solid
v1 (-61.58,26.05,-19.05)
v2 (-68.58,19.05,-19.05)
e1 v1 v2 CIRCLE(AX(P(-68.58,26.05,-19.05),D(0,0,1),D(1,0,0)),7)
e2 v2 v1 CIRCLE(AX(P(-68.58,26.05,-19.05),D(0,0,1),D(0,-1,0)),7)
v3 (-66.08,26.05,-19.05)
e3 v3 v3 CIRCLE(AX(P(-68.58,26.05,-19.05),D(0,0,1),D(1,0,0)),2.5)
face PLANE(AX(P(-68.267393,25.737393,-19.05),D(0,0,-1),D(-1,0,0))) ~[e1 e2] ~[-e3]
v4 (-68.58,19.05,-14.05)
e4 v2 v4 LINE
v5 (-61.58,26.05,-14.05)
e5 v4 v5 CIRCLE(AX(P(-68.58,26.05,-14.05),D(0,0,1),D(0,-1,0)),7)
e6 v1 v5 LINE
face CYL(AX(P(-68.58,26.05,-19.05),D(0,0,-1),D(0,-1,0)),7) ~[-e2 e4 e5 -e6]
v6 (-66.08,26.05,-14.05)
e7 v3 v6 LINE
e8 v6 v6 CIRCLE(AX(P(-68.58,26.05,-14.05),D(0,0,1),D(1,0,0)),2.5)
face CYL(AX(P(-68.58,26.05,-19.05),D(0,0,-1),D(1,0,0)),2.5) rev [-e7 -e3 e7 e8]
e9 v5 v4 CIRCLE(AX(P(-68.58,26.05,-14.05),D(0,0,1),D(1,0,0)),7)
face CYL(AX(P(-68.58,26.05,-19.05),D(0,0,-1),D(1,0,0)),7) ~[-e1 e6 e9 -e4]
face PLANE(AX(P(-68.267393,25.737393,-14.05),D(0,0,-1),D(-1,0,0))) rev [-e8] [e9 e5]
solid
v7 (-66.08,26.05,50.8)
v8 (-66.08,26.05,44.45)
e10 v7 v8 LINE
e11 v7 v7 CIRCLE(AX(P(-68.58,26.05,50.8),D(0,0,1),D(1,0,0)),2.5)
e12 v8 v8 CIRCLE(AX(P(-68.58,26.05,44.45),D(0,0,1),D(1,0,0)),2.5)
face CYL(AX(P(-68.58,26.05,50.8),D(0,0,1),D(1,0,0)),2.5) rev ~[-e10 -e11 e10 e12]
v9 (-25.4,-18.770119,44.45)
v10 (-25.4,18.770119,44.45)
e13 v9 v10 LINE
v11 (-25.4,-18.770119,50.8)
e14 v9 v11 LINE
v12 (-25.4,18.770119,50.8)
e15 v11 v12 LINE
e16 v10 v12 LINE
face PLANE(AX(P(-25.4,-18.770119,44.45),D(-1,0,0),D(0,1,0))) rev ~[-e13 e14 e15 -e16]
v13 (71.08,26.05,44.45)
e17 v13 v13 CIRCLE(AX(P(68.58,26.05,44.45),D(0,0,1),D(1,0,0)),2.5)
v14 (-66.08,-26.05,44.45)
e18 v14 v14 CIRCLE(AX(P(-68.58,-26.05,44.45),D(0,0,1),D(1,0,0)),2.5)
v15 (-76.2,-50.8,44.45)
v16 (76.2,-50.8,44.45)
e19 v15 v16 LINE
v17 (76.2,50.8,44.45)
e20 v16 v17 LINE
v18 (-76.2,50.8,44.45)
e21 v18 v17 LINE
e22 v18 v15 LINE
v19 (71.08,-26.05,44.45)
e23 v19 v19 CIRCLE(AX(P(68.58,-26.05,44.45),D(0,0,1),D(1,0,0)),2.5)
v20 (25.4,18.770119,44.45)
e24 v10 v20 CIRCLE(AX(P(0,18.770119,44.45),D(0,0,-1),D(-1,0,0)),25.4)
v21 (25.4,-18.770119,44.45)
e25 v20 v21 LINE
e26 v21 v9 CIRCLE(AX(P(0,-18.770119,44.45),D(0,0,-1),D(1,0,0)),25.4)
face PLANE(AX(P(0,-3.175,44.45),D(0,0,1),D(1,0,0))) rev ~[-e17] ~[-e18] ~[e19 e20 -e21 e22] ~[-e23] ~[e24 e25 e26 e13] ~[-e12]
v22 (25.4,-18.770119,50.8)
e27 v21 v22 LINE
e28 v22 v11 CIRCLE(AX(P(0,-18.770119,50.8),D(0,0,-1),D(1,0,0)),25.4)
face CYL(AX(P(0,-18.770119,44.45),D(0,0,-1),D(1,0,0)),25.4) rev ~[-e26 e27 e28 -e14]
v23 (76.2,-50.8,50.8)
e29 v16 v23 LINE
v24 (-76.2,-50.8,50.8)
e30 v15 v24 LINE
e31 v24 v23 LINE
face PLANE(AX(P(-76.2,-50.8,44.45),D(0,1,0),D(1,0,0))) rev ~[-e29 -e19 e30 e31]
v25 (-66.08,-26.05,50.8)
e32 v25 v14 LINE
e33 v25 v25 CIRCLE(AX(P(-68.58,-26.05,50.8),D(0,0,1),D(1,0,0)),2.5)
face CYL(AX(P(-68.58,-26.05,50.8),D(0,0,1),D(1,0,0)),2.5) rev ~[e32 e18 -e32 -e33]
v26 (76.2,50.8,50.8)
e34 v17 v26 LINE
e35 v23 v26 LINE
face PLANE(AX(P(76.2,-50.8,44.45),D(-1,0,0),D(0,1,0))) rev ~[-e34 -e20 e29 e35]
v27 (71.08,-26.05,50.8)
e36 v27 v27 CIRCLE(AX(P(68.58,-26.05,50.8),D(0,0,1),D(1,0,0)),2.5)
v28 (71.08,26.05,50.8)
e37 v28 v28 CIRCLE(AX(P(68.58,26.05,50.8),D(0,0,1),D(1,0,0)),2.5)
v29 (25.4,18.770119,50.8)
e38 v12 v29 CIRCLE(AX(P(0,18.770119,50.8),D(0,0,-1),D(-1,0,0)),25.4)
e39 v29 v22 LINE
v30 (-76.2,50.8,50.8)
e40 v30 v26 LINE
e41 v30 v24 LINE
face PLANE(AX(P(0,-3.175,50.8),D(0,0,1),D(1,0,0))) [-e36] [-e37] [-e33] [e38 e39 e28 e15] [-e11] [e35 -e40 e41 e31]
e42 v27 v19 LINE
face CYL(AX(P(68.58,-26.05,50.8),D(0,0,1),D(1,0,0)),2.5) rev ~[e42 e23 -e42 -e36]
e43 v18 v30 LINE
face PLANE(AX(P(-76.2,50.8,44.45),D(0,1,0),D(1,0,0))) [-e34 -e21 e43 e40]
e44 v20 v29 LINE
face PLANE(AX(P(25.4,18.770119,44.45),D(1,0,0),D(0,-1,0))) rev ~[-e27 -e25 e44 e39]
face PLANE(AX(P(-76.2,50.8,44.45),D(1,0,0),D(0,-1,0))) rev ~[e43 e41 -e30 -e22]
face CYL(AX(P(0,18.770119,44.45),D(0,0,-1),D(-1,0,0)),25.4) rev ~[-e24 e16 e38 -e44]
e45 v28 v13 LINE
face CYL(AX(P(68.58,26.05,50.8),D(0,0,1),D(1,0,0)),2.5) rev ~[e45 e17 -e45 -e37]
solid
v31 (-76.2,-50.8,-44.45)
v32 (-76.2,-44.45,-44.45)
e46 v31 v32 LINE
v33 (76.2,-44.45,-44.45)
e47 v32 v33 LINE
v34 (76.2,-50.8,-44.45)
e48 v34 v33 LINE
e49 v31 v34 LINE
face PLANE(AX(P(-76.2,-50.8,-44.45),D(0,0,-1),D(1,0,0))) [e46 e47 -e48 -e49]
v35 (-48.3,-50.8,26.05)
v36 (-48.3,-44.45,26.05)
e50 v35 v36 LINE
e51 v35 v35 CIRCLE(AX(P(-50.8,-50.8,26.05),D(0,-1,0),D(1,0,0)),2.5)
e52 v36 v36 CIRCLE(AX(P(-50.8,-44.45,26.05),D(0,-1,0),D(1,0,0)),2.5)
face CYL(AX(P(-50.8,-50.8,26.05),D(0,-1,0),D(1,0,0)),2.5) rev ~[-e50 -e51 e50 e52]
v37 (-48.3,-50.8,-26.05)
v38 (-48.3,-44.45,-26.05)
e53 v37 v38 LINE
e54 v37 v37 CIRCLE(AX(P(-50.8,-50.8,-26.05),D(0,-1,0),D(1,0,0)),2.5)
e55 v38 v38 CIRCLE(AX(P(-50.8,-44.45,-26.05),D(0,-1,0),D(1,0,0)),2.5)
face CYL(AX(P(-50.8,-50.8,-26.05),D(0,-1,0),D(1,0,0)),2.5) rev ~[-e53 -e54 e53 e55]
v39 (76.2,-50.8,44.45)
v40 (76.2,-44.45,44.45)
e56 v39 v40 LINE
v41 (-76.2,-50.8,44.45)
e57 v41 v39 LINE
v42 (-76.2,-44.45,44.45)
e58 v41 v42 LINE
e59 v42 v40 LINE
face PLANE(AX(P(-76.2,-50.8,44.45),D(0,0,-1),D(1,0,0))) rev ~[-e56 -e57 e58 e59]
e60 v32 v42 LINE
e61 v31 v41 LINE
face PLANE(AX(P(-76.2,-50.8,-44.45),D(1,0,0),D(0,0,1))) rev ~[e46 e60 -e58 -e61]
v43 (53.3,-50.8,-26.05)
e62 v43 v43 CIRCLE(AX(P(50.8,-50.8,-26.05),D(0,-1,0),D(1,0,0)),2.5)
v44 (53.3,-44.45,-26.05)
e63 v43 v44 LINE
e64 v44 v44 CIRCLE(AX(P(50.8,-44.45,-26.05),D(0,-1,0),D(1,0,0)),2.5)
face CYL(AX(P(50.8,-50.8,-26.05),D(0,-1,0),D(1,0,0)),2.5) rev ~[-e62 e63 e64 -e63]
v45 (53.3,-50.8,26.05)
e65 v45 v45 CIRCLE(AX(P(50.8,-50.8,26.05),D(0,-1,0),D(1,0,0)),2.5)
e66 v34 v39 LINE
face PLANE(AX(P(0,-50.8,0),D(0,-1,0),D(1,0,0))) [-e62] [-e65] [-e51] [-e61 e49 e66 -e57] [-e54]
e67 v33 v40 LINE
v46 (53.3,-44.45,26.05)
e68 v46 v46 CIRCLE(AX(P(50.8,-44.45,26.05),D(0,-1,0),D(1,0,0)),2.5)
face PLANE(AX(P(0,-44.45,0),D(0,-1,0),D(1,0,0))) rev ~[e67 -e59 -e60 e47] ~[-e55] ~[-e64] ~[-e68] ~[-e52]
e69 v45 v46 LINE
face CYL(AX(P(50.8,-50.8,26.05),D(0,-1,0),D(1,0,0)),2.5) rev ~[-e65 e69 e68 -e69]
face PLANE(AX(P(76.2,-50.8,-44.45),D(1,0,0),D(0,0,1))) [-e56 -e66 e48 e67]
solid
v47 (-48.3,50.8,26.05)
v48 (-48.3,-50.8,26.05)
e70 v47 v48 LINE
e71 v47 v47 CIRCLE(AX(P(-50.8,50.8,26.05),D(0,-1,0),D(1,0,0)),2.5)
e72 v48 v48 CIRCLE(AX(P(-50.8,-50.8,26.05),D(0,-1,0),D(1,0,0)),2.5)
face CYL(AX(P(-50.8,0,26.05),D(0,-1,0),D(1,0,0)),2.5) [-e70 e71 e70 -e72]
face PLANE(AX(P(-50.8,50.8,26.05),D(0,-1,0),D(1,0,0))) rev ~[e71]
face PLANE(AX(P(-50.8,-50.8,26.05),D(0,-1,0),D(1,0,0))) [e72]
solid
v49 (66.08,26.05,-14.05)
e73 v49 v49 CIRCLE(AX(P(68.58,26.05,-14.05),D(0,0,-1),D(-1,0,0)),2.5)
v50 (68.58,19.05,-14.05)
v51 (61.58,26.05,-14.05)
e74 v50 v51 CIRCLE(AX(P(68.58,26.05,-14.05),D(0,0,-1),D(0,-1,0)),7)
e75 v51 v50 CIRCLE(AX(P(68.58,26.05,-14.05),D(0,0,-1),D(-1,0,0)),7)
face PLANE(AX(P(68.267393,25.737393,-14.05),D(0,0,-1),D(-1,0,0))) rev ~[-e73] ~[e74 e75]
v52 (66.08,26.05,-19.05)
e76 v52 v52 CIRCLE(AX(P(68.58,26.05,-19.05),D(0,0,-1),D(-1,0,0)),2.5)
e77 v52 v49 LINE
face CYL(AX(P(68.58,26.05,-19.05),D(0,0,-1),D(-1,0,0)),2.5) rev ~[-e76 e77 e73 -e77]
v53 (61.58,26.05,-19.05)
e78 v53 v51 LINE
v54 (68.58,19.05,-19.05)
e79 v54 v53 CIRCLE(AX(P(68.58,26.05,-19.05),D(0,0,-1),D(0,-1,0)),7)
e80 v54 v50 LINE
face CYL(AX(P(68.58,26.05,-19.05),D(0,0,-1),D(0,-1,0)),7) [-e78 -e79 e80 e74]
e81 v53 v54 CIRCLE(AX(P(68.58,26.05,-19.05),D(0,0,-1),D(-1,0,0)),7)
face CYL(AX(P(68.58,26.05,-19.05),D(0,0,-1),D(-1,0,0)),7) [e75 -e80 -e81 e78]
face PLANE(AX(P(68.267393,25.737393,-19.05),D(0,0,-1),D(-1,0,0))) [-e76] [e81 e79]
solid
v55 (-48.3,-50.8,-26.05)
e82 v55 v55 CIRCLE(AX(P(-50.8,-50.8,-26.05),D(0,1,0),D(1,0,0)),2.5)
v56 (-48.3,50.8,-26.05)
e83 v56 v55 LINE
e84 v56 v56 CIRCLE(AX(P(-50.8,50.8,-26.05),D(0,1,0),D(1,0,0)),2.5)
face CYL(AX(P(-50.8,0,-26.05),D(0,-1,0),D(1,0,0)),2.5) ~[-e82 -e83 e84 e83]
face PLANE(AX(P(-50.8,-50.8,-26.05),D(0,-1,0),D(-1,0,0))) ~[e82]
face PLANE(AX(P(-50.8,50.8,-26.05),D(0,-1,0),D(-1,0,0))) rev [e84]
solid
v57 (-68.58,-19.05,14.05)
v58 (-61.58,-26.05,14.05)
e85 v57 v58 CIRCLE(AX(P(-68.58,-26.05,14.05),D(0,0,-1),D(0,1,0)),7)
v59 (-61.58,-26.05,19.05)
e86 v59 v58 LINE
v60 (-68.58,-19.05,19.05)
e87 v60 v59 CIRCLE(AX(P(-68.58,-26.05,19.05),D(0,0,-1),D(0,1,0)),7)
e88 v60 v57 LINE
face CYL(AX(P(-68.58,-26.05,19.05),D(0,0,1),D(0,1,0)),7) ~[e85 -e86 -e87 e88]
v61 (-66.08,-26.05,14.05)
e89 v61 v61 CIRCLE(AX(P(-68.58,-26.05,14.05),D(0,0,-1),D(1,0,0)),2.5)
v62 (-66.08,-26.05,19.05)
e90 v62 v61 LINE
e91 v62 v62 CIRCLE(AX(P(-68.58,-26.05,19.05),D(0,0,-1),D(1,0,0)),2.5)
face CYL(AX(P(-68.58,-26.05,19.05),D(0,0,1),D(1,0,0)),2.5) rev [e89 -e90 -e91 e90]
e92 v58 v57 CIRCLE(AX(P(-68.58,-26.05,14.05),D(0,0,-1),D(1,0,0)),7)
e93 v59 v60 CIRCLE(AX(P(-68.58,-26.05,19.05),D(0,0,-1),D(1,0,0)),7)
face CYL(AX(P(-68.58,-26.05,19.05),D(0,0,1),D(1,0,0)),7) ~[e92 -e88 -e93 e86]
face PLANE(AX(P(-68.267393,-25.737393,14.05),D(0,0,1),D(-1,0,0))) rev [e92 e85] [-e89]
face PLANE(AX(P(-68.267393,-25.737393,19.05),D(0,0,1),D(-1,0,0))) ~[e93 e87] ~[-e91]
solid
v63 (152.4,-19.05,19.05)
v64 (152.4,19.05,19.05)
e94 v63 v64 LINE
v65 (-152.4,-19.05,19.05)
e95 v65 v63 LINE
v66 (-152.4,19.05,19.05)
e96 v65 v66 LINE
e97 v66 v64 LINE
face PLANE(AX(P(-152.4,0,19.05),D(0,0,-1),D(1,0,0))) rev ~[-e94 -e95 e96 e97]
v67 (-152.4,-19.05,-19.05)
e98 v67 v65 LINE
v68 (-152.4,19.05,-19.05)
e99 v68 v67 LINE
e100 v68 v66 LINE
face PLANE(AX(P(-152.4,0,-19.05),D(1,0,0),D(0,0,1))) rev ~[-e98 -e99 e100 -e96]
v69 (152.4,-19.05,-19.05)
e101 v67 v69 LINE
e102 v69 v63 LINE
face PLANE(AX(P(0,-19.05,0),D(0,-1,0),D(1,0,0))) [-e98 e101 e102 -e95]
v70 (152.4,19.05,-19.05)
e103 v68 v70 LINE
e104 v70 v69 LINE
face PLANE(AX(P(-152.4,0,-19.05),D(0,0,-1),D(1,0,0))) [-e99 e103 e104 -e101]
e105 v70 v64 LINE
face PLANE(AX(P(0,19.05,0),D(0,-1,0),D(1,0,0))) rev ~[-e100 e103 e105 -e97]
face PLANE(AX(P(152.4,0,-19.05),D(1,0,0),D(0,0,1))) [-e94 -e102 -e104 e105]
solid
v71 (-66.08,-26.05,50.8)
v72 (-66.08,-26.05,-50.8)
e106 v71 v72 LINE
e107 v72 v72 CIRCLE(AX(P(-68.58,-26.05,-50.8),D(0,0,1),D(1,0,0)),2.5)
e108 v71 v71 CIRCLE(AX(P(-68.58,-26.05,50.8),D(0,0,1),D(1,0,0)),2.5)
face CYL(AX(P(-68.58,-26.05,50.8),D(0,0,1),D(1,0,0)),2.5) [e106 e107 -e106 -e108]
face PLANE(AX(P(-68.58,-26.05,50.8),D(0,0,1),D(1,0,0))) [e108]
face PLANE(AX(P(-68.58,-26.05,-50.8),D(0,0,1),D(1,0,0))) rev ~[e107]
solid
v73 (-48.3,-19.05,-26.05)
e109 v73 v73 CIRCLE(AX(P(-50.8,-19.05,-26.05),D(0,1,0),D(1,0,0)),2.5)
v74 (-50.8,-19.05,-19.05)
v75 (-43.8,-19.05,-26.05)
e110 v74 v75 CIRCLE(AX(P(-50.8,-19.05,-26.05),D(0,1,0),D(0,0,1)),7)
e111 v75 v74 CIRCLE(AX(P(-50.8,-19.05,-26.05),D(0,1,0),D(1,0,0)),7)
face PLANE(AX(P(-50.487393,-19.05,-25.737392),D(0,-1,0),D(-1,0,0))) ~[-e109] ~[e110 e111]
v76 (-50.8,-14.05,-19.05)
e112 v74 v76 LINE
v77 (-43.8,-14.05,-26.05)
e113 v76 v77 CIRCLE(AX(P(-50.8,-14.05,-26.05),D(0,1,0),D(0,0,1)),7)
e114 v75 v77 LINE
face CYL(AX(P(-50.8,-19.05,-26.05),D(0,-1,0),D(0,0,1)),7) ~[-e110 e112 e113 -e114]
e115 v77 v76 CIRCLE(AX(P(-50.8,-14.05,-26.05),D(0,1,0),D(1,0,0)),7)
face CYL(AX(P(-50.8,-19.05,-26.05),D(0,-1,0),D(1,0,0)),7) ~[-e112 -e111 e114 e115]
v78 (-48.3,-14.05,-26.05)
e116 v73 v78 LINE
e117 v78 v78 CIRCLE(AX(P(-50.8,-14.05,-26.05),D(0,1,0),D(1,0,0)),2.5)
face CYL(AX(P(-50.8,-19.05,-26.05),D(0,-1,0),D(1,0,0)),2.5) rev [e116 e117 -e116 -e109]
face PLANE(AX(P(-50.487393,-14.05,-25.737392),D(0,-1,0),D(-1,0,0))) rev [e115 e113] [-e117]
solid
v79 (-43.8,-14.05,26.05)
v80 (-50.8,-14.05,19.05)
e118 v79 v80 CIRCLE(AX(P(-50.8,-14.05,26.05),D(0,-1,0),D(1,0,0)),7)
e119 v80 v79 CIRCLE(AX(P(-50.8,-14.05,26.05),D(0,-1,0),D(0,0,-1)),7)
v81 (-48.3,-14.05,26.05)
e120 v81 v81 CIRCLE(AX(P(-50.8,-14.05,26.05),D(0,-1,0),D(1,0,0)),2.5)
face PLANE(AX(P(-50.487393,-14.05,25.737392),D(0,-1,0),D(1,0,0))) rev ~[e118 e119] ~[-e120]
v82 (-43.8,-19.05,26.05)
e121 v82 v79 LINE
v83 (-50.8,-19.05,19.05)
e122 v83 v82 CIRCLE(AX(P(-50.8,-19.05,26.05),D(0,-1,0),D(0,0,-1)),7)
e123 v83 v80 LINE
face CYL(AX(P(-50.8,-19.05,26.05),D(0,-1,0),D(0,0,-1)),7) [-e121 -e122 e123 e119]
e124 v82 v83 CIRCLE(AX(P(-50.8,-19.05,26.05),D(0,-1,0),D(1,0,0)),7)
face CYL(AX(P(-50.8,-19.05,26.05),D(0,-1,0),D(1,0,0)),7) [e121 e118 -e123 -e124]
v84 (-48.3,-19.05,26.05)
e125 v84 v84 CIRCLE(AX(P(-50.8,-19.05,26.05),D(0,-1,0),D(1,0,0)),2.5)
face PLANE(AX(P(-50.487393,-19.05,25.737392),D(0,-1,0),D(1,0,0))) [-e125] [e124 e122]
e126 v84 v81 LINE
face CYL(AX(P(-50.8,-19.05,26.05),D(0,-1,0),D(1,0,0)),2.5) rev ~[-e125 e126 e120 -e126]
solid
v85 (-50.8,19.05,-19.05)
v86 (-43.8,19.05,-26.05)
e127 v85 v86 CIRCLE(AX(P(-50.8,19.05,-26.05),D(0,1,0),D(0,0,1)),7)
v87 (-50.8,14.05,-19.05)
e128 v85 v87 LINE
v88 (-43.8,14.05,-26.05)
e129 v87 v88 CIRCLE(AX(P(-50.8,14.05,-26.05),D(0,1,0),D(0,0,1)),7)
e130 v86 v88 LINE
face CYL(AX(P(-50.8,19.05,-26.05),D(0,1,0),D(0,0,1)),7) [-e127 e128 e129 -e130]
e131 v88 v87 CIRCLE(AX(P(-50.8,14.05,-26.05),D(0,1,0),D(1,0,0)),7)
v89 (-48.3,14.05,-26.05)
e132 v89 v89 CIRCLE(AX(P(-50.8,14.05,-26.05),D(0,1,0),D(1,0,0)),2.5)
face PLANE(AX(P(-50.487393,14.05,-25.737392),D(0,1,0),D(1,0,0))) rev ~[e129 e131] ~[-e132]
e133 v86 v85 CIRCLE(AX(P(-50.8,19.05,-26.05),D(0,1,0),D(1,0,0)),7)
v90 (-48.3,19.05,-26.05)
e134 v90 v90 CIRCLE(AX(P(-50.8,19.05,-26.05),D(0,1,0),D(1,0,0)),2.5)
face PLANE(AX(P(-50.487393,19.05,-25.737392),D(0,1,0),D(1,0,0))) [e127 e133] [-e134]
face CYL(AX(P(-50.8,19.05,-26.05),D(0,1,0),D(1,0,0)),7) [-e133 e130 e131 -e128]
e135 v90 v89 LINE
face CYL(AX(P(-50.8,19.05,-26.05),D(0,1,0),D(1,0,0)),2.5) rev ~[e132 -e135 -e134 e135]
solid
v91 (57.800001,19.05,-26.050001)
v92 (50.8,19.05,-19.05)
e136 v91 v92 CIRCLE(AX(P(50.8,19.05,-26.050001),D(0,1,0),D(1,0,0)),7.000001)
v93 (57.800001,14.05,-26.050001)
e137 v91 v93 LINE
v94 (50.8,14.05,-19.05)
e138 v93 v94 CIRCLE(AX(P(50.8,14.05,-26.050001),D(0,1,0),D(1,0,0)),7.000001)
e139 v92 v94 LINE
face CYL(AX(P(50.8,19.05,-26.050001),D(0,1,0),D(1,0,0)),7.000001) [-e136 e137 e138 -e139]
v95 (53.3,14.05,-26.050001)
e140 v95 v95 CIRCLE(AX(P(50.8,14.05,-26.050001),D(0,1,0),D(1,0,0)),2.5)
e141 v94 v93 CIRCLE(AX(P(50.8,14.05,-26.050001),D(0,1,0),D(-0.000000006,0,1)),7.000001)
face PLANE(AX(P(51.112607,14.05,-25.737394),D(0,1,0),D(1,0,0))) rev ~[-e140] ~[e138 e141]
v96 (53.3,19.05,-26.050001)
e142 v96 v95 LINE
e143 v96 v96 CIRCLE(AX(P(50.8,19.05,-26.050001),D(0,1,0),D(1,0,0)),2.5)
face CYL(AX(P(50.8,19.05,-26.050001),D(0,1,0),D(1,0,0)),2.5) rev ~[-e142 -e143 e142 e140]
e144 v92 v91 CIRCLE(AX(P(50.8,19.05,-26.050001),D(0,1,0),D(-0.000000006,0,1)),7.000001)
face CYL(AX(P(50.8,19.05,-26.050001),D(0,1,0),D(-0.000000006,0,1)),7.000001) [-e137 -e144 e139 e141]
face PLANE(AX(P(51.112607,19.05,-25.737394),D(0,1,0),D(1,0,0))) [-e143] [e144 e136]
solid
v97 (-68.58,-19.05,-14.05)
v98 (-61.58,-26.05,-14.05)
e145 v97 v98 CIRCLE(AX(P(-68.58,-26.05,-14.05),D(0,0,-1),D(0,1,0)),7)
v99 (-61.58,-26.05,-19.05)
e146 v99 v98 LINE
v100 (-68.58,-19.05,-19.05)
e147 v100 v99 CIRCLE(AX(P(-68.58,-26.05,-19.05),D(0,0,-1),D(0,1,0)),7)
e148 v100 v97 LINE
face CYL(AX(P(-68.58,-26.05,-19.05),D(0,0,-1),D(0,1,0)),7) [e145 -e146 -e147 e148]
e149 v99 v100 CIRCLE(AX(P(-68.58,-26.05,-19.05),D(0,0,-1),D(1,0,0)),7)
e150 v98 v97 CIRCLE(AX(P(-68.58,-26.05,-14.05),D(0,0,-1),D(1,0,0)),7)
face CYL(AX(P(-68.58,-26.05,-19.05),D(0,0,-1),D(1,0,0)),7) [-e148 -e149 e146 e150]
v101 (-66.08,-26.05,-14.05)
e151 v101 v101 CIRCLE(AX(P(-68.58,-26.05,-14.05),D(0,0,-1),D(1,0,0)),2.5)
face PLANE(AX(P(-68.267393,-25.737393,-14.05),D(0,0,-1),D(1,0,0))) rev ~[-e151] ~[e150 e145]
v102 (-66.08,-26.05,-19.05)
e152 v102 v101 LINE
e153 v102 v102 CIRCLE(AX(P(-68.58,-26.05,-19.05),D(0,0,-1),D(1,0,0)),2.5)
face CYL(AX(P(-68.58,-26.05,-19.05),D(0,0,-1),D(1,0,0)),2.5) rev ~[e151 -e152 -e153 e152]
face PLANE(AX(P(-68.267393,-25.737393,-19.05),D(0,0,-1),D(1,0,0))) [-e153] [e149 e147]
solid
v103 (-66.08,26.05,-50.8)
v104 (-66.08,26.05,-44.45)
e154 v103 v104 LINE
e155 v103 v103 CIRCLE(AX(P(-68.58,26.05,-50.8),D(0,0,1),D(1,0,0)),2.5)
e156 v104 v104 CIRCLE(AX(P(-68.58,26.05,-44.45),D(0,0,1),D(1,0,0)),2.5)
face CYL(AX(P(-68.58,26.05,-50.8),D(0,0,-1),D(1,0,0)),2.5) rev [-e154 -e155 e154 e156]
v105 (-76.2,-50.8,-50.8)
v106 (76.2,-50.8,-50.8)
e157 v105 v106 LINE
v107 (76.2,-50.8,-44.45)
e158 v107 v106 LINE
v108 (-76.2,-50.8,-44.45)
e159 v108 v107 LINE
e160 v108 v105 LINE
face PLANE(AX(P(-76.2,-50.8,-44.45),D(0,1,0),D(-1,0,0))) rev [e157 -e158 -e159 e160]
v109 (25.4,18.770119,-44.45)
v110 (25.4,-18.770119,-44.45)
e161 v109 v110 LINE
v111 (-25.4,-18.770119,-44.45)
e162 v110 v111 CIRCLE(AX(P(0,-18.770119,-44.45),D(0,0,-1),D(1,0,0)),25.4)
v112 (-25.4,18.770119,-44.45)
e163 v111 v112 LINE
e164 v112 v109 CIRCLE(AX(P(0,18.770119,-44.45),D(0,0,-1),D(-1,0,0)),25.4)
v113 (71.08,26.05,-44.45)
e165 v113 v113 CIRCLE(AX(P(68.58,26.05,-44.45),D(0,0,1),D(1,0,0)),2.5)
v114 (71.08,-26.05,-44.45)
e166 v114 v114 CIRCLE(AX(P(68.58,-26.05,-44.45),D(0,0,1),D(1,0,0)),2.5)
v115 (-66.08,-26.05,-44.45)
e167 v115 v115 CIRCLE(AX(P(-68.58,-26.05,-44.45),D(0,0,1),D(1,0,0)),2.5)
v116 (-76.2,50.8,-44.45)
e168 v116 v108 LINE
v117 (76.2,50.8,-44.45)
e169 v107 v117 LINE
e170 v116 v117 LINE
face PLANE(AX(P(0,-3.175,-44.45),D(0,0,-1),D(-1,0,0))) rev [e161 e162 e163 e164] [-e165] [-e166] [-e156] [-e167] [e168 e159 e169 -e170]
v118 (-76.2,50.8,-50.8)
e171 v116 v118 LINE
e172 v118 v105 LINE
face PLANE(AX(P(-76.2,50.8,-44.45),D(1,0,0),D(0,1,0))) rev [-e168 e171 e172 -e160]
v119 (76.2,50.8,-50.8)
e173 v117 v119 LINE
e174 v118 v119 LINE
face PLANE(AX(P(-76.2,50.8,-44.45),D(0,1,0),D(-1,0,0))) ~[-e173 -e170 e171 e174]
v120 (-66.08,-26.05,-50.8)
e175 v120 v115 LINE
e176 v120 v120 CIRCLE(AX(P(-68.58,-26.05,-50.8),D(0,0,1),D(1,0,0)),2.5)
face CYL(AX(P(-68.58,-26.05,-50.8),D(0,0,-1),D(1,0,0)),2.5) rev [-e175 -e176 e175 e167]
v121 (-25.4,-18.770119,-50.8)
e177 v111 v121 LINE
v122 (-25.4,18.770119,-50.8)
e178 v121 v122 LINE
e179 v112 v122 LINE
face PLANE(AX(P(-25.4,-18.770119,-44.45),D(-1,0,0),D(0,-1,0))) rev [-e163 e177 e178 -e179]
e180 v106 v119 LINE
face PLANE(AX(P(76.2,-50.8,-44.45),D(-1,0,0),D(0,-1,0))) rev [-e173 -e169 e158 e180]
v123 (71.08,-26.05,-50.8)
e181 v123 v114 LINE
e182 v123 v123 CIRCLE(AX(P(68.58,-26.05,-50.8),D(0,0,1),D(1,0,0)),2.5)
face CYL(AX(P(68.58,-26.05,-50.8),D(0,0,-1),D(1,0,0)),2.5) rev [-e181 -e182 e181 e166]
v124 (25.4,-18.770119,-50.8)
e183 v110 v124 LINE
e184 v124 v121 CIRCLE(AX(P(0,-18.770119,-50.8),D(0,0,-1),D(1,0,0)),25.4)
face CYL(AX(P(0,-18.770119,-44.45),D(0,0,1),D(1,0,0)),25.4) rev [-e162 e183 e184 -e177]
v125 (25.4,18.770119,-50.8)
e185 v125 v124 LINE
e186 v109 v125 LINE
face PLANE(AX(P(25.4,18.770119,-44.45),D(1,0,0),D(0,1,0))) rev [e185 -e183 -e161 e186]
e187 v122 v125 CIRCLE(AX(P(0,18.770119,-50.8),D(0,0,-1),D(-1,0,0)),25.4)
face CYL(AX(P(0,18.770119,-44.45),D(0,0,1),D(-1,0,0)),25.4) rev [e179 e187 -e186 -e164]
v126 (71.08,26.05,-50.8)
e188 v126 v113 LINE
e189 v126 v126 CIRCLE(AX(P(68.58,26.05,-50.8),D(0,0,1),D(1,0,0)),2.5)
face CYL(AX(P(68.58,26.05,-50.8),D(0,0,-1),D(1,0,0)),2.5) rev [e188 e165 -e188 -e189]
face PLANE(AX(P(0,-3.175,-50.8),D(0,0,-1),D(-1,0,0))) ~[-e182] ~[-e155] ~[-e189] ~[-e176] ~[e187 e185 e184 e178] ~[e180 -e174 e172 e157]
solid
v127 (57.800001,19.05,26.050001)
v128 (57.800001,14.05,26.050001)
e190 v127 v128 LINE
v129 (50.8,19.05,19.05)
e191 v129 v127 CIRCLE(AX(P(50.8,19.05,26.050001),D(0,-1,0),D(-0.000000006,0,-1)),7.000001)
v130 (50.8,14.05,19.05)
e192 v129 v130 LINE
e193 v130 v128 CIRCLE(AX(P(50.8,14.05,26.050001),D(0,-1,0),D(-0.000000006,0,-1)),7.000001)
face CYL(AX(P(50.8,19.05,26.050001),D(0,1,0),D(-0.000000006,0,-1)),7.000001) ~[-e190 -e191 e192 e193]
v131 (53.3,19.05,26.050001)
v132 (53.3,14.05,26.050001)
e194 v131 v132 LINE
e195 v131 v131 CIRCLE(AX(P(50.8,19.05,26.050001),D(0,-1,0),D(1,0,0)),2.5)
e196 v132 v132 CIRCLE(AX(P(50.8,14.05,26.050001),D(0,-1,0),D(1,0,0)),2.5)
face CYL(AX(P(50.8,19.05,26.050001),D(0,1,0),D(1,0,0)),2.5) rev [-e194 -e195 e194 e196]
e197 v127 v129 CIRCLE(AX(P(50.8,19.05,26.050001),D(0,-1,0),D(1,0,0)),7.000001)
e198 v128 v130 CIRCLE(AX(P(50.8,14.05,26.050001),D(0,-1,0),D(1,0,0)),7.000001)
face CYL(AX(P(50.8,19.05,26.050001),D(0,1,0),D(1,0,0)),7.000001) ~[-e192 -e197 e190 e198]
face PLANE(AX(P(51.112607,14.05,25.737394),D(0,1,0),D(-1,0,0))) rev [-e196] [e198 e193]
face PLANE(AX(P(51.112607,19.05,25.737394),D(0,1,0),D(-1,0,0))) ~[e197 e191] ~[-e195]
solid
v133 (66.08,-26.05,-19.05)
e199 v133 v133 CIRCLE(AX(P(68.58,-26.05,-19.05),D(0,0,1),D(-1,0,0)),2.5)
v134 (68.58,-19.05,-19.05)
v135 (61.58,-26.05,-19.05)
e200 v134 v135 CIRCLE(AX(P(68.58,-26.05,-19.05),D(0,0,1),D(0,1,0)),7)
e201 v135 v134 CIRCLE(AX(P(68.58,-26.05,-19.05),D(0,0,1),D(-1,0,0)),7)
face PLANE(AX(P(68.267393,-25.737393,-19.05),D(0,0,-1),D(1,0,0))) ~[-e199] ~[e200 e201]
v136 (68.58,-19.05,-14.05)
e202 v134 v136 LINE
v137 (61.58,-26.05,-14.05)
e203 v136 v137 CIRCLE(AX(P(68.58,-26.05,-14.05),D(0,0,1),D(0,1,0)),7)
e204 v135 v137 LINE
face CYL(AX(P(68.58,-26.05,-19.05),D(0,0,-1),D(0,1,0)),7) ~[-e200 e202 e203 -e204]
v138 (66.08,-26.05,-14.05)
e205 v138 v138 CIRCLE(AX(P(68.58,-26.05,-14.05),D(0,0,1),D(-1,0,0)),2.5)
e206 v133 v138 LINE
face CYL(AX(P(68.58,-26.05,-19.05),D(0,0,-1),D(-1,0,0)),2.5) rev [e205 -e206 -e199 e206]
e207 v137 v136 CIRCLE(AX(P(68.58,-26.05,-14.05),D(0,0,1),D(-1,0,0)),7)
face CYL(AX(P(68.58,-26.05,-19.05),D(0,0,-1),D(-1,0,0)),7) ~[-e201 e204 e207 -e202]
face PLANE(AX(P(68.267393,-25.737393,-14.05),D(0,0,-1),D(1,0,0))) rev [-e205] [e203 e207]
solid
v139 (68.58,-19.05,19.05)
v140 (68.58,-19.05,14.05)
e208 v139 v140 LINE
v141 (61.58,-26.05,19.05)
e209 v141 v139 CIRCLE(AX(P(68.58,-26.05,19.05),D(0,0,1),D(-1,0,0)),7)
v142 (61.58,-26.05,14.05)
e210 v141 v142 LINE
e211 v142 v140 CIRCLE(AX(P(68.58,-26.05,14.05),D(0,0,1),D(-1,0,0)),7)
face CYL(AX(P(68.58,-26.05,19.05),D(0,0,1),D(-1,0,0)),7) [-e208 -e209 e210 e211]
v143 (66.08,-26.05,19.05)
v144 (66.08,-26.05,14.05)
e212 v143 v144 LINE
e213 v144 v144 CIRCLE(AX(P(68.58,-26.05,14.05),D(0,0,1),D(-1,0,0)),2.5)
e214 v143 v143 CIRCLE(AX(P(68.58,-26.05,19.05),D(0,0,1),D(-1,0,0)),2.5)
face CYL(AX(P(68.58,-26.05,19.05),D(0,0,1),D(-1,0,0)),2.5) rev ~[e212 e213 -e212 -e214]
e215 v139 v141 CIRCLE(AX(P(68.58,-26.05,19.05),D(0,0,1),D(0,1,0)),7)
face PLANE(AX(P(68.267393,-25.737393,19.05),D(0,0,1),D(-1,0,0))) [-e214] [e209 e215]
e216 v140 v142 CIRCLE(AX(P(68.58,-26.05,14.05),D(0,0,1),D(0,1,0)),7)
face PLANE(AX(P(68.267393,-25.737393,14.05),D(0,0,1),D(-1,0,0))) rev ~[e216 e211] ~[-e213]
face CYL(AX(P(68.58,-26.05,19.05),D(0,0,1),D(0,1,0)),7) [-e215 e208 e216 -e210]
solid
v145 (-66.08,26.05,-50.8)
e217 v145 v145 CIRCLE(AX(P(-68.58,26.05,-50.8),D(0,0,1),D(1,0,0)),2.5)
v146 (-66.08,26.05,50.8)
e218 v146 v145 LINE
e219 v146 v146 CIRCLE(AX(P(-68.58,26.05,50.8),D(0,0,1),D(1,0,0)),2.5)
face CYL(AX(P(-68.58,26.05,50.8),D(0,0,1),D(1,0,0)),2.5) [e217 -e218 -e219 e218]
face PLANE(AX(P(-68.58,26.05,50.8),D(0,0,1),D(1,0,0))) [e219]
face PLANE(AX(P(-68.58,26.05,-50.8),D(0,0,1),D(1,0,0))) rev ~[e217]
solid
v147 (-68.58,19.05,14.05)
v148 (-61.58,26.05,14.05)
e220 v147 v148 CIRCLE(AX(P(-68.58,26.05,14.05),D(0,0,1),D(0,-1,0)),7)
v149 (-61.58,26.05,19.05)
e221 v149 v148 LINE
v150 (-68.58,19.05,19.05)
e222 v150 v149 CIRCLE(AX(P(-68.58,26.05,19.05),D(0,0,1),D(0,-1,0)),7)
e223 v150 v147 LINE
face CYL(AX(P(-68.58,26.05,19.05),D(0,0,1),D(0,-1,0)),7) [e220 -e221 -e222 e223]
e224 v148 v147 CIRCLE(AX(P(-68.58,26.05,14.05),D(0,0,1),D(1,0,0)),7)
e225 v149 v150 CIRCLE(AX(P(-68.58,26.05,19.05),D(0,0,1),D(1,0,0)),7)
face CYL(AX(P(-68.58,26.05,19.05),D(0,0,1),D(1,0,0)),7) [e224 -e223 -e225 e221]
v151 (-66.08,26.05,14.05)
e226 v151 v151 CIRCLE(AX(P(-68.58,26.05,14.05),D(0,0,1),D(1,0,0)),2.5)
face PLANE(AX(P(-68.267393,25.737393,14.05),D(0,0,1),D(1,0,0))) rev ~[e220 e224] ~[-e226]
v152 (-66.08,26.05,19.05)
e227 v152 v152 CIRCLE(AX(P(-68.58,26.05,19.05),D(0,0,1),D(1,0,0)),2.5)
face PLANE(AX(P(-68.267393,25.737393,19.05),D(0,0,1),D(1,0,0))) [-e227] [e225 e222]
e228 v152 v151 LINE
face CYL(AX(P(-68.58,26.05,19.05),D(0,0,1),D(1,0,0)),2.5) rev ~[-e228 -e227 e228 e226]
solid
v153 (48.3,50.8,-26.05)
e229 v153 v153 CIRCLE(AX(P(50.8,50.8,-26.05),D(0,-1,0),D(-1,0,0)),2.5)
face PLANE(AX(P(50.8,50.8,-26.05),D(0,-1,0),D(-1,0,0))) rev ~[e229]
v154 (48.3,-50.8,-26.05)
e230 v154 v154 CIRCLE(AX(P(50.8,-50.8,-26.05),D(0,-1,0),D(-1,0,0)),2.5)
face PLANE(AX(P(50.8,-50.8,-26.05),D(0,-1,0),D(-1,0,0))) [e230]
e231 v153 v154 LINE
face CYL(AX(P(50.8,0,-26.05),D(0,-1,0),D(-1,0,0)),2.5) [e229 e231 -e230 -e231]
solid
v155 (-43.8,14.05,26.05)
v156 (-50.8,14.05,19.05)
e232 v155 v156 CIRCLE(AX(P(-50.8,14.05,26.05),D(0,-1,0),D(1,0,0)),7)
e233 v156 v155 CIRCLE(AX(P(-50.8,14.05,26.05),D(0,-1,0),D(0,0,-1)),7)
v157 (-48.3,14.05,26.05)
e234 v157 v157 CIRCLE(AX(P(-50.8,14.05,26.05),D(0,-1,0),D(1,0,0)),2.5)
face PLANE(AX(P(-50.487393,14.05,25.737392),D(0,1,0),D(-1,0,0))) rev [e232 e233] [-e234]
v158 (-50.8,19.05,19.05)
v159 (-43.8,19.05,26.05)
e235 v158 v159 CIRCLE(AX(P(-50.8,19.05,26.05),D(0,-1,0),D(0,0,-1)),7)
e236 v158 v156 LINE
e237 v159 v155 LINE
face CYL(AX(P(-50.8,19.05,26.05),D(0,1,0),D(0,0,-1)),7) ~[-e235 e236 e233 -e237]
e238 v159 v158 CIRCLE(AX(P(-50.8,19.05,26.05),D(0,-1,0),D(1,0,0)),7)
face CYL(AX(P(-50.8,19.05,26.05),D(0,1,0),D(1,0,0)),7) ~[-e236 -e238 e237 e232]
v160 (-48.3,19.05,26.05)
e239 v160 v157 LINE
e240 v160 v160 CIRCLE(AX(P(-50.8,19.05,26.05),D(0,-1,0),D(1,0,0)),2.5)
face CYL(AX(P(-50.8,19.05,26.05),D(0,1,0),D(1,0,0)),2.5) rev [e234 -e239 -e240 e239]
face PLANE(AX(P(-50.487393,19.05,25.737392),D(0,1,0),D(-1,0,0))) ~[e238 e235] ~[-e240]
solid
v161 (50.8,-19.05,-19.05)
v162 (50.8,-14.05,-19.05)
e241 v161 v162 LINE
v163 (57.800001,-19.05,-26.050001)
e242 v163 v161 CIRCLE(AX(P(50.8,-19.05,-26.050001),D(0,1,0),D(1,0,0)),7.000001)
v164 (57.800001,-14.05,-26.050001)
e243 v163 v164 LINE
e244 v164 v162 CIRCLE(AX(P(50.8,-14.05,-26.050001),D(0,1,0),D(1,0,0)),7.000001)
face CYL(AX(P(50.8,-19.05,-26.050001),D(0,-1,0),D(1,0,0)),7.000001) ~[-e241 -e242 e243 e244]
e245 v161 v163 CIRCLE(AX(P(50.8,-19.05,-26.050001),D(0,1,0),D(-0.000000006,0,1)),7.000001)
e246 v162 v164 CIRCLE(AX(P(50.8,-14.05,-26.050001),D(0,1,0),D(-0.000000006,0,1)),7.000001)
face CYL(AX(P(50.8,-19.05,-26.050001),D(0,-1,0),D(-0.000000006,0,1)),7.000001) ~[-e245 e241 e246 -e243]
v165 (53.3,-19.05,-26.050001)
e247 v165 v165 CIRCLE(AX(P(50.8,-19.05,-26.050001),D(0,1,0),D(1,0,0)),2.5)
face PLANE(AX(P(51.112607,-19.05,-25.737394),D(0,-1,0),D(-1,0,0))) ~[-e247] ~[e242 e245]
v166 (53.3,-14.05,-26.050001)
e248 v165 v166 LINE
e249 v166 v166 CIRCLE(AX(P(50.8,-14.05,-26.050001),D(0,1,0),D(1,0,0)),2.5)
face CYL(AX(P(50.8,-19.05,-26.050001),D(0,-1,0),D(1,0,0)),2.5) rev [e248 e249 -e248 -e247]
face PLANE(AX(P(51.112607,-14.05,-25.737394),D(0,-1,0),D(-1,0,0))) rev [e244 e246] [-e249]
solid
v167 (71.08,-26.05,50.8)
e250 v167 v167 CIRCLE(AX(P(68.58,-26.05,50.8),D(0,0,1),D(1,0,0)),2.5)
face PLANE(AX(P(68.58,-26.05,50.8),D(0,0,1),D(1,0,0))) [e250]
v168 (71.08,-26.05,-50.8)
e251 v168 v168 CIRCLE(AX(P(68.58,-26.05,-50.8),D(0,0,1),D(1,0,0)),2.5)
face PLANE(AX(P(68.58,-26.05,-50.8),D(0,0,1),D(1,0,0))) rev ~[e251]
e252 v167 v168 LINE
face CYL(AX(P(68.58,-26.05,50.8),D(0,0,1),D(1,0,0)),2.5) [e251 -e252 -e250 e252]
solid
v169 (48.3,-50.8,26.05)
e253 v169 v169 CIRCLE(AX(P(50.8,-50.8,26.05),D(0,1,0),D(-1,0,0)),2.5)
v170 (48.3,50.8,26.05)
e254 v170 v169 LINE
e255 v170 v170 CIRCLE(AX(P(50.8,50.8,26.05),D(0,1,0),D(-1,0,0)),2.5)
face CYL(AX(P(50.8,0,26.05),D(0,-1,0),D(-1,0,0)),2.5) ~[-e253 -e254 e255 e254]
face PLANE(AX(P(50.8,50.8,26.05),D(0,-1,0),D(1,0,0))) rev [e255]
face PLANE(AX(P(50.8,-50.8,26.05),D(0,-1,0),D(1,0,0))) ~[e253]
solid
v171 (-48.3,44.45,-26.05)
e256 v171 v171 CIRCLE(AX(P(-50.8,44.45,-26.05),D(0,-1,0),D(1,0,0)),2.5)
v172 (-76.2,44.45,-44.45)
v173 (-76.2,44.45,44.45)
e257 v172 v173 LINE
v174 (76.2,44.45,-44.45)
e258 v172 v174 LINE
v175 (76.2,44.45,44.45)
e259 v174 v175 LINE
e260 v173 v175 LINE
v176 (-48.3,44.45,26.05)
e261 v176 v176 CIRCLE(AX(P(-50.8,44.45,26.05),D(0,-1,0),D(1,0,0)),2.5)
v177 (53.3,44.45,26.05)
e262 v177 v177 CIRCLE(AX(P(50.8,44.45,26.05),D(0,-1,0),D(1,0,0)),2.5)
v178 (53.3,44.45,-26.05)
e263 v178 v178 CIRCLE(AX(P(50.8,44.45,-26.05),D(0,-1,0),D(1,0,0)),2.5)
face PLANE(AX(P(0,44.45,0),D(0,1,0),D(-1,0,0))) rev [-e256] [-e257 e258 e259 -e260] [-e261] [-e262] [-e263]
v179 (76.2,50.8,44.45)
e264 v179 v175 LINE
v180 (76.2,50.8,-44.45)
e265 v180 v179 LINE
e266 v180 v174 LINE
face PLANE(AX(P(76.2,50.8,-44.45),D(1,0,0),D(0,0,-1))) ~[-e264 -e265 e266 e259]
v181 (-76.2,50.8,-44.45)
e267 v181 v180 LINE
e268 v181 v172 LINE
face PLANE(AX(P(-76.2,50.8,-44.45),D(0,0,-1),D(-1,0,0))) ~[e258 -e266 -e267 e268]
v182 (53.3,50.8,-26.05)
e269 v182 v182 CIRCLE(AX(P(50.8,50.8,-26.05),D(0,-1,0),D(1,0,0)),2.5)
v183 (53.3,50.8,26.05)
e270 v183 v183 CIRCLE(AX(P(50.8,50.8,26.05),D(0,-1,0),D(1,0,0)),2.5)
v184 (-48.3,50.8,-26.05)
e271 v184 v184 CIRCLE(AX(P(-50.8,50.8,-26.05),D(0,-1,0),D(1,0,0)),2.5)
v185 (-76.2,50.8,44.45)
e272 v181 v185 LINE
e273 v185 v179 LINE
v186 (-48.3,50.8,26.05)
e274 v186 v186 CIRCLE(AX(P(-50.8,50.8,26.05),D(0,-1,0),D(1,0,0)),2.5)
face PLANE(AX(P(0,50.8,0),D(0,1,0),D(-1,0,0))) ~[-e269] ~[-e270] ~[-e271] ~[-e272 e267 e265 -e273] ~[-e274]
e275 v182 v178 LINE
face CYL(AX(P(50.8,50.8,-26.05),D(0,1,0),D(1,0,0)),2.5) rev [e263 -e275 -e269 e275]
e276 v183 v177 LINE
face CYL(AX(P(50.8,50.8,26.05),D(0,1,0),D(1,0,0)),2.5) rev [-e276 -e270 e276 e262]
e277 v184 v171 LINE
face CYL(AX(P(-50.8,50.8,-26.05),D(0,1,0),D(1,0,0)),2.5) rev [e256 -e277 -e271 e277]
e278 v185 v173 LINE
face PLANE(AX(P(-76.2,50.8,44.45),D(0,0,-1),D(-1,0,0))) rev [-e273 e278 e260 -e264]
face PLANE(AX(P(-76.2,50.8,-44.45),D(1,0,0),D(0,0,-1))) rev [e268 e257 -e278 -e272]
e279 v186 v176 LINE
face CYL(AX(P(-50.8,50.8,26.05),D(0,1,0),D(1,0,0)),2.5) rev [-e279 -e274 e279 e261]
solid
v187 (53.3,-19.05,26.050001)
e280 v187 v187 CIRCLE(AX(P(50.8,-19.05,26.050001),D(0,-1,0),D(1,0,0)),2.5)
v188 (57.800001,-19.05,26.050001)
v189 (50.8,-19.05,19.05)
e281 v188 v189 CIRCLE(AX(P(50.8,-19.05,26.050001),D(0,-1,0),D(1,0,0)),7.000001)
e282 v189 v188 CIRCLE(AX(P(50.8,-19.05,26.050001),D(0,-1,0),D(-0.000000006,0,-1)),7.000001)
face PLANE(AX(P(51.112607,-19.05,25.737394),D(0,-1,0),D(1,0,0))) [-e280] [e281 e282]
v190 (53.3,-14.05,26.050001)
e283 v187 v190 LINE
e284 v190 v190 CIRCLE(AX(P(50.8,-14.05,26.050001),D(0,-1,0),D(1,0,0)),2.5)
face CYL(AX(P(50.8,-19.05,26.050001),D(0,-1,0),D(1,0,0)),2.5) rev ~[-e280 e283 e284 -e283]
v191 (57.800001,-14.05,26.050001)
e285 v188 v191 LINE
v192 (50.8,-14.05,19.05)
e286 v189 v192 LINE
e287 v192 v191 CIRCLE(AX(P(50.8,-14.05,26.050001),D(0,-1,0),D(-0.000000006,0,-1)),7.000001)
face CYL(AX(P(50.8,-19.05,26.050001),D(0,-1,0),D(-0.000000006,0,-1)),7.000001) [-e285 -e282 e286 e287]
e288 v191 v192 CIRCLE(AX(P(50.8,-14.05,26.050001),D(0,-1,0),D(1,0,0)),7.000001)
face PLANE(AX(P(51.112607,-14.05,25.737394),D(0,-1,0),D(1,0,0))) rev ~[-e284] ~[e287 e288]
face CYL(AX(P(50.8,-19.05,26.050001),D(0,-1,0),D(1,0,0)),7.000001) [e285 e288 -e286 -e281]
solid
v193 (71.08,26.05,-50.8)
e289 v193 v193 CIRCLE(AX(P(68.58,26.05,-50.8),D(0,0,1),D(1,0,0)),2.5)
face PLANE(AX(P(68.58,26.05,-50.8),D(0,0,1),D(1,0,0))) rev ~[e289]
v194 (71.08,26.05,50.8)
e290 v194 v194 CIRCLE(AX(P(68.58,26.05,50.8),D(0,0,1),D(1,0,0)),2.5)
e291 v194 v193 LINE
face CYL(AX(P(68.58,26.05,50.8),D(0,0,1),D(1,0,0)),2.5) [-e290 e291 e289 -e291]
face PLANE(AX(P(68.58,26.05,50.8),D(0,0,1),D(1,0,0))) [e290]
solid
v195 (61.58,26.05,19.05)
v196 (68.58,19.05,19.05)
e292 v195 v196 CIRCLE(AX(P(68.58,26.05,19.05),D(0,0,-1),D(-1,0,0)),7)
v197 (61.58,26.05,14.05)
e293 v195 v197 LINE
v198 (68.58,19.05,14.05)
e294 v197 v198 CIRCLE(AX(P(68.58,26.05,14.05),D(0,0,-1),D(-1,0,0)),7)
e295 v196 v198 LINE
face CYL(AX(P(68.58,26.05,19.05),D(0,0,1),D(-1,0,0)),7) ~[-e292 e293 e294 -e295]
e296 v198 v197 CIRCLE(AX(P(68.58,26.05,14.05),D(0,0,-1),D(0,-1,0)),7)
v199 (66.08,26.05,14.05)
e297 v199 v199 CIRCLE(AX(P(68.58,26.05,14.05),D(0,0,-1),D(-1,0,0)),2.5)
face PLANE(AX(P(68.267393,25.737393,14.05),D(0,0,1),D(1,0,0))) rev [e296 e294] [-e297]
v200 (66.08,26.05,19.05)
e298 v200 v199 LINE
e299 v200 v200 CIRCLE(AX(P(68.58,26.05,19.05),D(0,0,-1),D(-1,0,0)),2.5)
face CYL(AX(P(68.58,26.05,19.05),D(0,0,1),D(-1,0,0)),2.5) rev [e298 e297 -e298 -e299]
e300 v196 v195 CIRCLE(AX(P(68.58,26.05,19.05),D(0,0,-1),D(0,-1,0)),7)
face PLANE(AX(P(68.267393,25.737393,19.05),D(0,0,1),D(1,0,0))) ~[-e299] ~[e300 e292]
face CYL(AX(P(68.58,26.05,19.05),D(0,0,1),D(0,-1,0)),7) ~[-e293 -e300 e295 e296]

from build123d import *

# Parameters (mm, degrees)
F0_W      = 304.8
F0_H      = 38.1
F1_DEPTH  = 19.05
F2_R      = 2.5
F3_DEPTH  = 5
F6_R      = 2.5
F7_DEPTH  = 50.8
F10_W     = 152.4
F10_H     = 88.9
F10_R     = 2.5
F11_DEPTH = 6.35
F13_W     = 152.4
F13_H     = 95.25
F13_H_2   = 6.35
F14_DEPTH = 6.35
F15_R     = 2.5
F16_DEPTH = 5
F20_R     = 2.5
F21_DEPTH = 6.35
F23_R     = 2.5
F24_DEPTH = 101.6


with BuildPart() as f1:
    # F0 (on Front) → F1 (new body, symmetric)
    with BuildSketch(Plane.XZ):
        Rectangle(F0_W, F0_H)
    extrude(amount=F1_DEPTH, both=True)


with BuildPart() as f3:
    # F2 (on face) → F3 (new body)
    with BuildSketch(Plane.XZ.offset(19.05)):
        with BuildLine():
            ThreePointArc((-50.8, 19.0499995202), (-45.8502525317, 21.1002520519), (-43.8, 26.0499995202))
            ThreePointArc((-43.8, 26.0499995202), (-55.7497474683, 30.9997469885), (-50.8, 19.0499995202))
        make_face()
        with Locations((-50.8, 26.0499995202)):
            Circle(F2_R, mode=Mode.SUBTRACT)
    extrude(amount=-F3_DEPTH)


with BuildPart() as f3b:
    # F2 (on face) → F3, piece 2 (new body)
    with BuildSketch(Plane.XZ.offset(19.05)):
        with BuildLine():
            ThreePointArc((57.8000012957, 26.0500012957), (45.8502516313, 30.9997496959), (50.7999999553, 19.05))
            ThreePointArc((50.7999999553, 19.05), (55.7497483687, 21.1002528954), (57.8000012957, 26.0500012957))
        make_face()
        with Locations((50.8, 26.0500012957)):
            Circle(F2_R, mode=Mode.SUBTRACT)
    extrude(amount=-F3_DEPTH)


with BuildPart() as f4_1:
    # F4: instance of F3
    add(f3.part.mirror(Plane.XZ))


with BuildPart() as f4_2:
    # F4: instance of F3b
    add(f3b.part.mirror(Plane.XZ))


with BuildPart() as f5_1:
    # F5: instance of F3b
    add(f3b.part.mirror(Plane.XY))


with BuildPart() as f5_2:
    # F5: instance of F4_2
    add(f4_2.part.mirror(Plane.XY))


with BuildPart() as f5_3:
    # F5: instance of F3
    add(f3.part.mirror(Plane.XY))


with BuildPart() as f5_4:
    # F5: instance of F4_1
    add(f4_1.part.mirror(Plane.XY))


with BuildPart() as f7:
    # F6 (on Front) → F7 (new body, symmetric)
    with BuildSketch(Plane.XZ):
        with Locations((-50.8, 26.0499995202)):
            Circle(F6_R)
    extrude(amount=F7_DEPTH, both=True)


with BuildPart() as f8_1:
    # F8: instance of F7
    add(f7.part.mirror(Plane.YZ))


with BuildPart() as f9_1:
    # F9: instance of F8_1
    add(f8_1.part.mirror(Plane.XY))


with BuildPart() as f9_2:
    # F9: instance of F7
    add(f7.part.mirror(Plane.XY))


with BuildPart() as f11:
    # F10 (on face) → F11 (new body)
    with BuildSketch(Plane.XZ.offset(50.8)):
        Rectangle(F10_W, F10_H)
        with Locations((-50.8, -26.0499995202)):
            Circle(F10_R, mode=Mode.SUBTRACT)
        with Locations((50.8, -26.0499995202)):
            Circle(F10_R, mode=Mode.SUBTRACT)
        with Locations((-50.8, 26.0499995202)):
            Circle(F10_R, mode=Mode.SUBTRACT)
        with Locations((50.8, 26.0499995202)):
            Circle(F10_R, mode=Mode.SUBTRACT)
    extrude(amount=-F11_DEPTH)


with BuildPart() as f12_1:
    # F12: instance of F11
    add(f11.part.mirror(Plane.XZ))


with BuildPart() as f14:
    # F13 (on face) → F14 (new body)
    with BuildSketch(Plane.XY.offset(44.45)):
        with Locations((0, -3.175)):
            Rectangle(F13_W, F13_H)
        with BuildLine():
            Line((-25.4, -18.7701191753), (-25.4, 18.7701191753))
            ThreePointArc((-25.4, 18.7701191753), (0, 44.1701191753), (25.4, 18.7701191753))
            Line((25.4, 18.7701191753), (25.4, -18.7701191753))
            ThreePointArc((25.4, -18.7701191753), (0, -44.1701191753), (-25.4, -18.7701191753))
        make_face(mode=Mode.SUBTRACT)
        with Locations((0, 47.625)):
            Rectangle(F13_W, F13_H_2)
    extrude(amount=F14_DEPTH)

    # F20 (on face) → F21 (cut, through all)
    with BuildSketch(Plane.XY.offset(50.8)):
        with Locations((-68.58, 26.05)):
            Circle(F20_R)
        with Locations((-68.58, -26.05)):
            Circle(F20_R)
        with Locations((68.58, 26.05)):
            Circle(F20_R)
        with Locations((68.58, -26.05)):
            Circle(F20_R)
    extrude(amount=-F21_DEPTH, mode=Mode.SUBTRACT)


with BuildPart() as f16:
    # F15 (on face) → F16 (new body)
    with BuildSketch(Plane.XY.offset(19.05)):
        with BuildLine():
            ThreePointArc((-68.58, 19.05), (-63.6302525317, 21.1002525317), (-61.58, 26.05))
            ThreePointArc((-61.58, 26.05), (-73.5297474683, 30.9997474683), (-68.58, 19.05))
        make_face()
        with Locations((-68.58, 26.05)):
            Circle(F15_R, mode=Mode.SUBTRACT)
    extrude(amount=-F16_DEPTH)


with BuildPart() as f17_1:
    # F17: instance of F16
    add(f16.part.mirror(Plane.XY))


with BuildPart() as f18_1:
    # F18: instance of F17_1
    add(f17_1.part.mirror(Plane.YZ))


with BuildPart() as f18_2:
    # F18: instance of F16
    add(f16.part.mirror(Plane.YZ))


with BuildPart() as f19_1:
    # F19: instance of F17_1
    add(f17_1.part.mirror(Plane.XZ))


with BuildPart() as f19_2:
    # F19: instance of F16
    add(f16.part.mirror(Plane.XZ))


with BuildPart() as f19_3:
    # F19: instance of F18_1
    add(f18_1.part.mirror(Plane.XZ))


with BuildPart() as f19_4:
    # F19: instance of F18_2
    add(f18_2.part.mirror(Plane.XZ))


with BuildPart() as f22_1:
    # F22: instance of F14
    add(f14.part.mirror(Plane.XY))


with BuildPart() as f24:
    # F23 (on face) → F24 (new body, through all)
    with BuildSketch(Plane.XY.offset(50.8)):
        with Locations((-68.58, 26.05)):
            Circle(F23_R)
    extrude(amount=-F24_DEPTH)


with BuildPart() as f24b:
    # F23 (on face) → F24, piece 2 (new body, through all)
    with BuildSketch(Plane.XY.offset(50.8)):
        with Locations((-68.58, -26.05)):
            Circle(F23_R)
    extrude(amount=-F24_DEPTH)


with BuildPart() as f24c:
    # F23 (on face) → F24, piece 3 (new body, through all)
    with BuildSketch(Plane.XY.offset(50.8)):
        with Locations((68.58, -26.05)):
            Circle(F23_R)
    extrude(amount=-F24_DEPTH)


with BuildPart() as f24d:
    # F23 (on face) → F24, piece 4 (new body, through all)
    with BuildSketch(Plane.XY.offset(50.8)):
        with Locations((68.58, 26.05)):
            Circle(F23_R)
    extrude(amount=-F24_DEPTH)


solid = Compound([f1.part, f3.part, f3b.part, f4_1.part, f4_2.part, f5_1.part, f5_2.part, f5_3.part, f5_4.part, f7.part, f8_1.part, f9_1.part, f9_2.part, f11.part, f12_1.part, f14.part, f16.part, f17_1.part, f18_1.part, f18_2.part, f19_1.part, f19_2.part, f19_3.part, f19_4.part, f22_1.part, f24.part, f24b.part, f24c.part, f24d.part])
